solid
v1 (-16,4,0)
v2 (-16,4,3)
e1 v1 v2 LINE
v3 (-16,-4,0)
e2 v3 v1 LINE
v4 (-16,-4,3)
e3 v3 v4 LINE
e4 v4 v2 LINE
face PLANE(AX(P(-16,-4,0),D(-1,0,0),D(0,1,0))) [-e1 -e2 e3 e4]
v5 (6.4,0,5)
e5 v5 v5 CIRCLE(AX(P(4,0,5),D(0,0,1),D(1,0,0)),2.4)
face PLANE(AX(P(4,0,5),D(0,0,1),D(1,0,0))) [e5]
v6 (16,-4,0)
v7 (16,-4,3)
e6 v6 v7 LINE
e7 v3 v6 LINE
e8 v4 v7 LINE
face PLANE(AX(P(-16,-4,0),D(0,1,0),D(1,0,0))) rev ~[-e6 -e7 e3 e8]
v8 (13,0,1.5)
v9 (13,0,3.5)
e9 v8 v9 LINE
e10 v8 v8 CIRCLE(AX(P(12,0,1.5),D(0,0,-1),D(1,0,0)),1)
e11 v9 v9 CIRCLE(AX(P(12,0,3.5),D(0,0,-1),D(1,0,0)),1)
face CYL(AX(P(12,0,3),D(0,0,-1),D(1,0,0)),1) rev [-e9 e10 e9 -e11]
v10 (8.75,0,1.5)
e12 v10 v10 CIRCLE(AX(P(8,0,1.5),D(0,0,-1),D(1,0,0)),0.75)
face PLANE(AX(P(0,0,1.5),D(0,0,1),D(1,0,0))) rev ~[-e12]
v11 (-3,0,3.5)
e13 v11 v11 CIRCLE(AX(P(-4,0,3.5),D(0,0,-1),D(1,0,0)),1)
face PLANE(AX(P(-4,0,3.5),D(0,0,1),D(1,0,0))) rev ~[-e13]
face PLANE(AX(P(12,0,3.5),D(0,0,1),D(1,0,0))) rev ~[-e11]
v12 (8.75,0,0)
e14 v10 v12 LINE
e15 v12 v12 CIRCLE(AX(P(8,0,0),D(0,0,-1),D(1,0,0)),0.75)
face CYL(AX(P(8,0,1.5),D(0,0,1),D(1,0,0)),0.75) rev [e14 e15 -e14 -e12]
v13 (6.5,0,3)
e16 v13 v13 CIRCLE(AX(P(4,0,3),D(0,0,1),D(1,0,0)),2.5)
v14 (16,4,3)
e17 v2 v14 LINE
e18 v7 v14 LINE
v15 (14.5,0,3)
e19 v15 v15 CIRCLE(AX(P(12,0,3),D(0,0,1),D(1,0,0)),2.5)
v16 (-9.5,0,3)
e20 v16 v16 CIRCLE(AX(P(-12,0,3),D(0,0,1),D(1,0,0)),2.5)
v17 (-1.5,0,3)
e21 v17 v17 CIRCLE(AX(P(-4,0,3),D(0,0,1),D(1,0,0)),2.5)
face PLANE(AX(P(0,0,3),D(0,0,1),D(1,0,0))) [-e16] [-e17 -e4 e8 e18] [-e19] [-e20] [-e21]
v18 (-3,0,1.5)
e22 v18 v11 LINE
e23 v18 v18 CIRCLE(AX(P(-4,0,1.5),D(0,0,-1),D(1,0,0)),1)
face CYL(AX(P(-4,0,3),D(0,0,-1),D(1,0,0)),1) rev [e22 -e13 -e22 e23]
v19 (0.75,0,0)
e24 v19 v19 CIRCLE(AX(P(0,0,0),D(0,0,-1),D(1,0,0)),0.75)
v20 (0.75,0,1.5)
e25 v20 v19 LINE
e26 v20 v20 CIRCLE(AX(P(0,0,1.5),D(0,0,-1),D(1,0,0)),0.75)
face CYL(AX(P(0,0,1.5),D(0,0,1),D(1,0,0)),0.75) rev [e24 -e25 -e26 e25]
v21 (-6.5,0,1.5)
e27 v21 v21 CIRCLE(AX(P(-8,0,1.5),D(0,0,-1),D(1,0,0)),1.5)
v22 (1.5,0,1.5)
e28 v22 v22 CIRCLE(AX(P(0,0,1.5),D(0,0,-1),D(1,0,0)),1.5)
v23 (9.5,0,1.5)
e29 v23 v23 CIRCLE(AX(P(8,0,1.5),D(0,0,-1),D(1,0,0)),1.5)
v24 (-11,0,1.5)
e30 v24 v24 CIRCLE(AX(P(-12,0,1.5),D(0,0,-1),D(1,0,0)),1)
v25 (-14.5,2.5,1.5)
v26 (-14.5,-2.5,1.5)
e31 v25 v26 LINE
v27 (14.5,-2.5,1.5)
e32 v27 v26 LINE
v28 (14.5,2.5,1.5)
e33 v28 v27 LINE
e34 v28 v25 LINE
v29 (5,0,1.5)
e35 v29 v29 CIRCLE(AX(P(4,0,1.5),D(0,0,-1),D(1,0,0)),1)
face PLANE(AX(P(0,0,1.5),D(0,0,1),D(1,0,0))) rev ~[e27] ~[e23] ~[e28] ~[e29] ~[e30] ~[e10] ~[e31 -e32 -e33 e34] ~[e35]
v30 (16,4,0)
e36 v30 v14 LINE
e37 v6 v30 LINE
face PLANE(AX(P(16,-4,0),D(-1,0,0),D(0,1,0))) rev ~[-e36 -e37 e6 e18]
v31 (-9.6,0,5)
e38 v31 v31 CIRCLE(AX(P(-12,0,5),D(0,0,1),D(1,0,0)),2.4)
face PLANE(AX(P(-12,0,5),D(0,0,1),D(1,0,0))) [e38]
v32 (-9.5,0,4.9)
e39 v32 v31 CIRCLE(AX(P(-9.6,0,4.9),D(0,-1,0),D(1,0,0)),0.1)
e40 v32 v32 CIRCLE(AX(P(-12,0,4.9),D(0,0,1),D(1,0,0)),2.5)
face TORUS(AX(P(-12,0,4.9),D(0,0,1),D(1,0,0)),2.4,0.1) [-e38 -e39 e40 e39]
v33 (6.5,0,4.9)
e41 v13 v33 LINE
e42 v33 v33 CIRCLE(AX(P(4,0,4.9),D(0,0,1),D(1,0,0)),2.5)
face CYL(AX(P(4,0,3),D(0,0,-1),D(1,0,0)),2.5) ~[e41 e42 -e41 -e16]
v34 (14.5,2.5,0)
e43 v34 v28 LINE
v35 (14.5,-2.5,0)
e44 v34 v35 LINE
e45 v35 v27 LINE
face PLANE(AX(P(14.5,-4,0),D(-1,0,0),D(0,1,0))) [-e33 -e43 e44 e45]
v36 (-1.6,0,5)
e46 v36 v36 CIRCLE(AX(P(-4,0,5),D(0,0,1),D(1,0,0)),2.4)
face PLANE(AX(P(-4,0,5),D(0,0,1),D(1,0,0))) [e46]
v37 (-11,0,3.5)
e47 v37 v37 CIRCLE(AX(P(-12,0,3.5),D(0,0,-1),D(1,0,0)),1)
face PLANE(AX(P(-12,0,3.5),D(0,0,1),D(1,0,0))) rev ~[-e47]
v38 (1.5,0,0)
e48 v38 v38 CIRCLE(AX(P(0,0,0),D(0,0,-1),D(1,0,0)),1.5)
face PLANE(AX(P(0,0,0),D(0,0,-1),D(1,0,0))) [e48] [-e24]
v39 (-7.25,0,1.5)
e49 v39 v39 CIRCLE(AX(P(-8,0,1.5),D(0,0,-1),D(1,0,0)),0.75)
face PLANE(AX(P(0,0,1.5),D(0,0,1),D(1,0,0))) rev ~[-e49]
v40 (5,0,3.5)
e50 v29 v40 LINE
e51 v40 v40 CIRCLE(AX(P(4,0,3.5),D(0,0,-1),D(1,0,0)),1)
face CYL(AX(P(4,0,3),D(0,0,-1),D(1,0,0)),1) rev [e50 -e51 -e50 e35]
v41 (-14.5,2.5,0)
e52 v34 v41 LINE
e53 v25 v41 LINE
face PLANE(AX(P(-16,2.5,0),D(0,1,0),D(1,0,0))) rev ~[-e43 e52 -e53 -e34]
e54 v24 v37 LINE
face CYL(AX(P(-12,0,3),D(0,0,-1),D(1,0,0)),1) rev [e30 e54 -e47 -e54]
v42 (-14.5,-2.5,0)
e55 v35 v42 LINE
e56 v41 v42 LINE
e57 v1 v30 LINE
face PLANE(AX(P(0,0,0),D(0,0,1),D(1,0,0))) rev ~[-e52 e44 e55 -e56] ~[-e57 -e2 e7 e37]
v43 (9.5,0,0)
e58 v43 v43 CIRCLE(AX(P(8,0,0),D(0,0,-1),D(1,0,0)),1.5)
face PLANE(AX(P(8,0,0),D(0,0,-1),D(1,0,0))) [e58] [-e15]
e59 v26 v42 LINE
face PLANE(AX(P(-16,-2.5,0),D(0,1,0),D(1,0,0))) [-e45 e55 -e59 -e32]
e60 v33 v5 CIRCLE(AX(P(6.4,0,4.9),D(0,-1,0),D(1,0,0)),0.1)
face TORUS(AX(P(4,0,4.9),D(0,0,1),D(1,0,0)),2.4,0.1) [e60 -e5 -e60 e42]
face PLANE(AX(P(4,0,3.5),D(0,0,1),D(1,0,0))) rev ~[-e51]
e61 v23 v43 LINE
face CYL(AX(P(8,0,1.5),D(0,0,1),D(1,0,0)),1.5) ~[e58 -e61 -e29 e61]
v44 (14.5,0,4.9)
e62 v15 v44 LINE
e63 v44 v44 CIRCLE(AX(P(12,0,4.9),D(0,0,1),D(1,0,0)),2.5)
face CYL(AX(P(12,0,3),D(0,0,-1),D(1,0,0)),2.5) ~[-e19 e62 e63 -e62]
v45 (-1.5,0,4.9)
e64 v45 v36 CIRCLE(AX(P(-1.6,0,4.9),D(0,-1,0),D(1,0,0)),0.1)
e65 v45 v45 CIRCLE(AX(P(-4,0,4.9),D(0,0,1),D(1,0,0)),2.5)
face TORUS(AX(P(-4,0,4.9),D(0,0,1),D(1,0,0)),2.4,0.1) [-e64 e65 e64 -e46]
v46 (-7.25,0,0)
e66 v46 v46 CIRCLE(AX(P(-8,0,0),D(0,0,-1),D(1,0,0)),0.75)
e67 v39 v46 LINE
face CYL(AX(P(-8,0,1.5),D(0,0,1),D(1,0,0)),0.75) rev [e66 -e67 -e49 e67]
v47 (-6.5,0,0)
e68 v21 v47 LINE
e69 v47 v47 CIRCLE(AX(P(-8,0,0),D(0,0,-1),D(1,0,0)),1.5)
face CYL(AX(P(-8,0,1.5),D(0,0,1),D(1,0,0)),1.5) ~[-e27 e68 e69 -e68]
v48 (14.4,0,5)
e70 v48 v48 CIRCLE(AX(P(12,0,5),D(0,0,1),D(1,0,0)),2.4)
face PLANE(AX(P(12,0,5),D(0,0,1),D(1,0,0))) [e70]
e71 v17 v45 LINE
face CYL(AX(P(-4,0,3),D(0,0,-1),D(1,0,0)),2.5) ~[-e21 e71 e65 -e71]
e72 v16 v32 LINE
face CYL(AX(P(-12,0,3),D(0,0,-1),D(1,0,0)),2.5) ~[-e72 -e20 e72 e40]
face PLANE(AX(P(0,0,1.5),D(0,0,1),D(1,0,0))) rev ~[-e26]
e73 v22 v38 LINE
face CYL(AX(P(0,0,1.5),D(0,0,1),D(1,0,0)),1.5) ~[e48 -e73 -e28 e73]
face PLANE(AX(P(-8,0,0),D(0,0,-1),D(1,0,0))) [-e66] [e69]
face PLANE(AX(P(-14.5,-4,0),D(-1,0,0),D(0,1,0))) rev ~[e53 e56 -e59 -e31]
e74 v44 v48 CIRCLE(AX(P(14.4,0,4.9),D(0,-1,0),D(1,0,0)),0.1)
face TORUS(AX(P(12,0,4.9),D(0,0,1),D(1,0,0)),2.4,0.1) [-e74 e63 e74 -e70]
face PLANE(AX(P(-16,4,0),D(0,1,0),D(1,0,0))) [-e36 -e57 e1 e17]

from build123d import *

# Parameters (mm, degrees)
F0_W     = 32
F0_H     = 8
F1_DEPTH = 3
F2_R     = 2.5
F3_DEPTH = 2
F4_R     = 0.1
F5_T     = -1.5
F6_R     = 1.5
F6_R_2   = 0.75
F7_DEPTH = 1.5


# Not quite as in the source:
# - a feature names something its author has since deleted; it is built from what else it names


with BuildPart() as f1:
    # F0 (on Top) → F1 (new body)
    with BuildSketch(Plane.XY):
        Rectangle(F0_W, F0_H)
    extrude(amount=F1_DEPTH)

    # F2 (on face) → F3 (join)
    with BuildSketch(Plane.XY.offset(3)):
        with Locations((-12, 0)):
            Circle(F2_R)
        with Locations((-4, 0)):
            Circle(F2_R)
        with Locations((4, 0)):
            Circle(F2_R)
        with Locations((12, 0)):
            Circle(F2_R)
    extrude(amount=F3_DEPTH)

    # F4
    f4_edges = [f1.edges().sort_by_distance(p)[0] for p in [
        (-14.5, 0, 5),
        (-6.5, 0, 5),
        (1.5, 0, 5),
        (9.5, 0, 5),
    ]]
    fillet(f4_edges, radius=F4_R)

    # F5
    f5_openings = [f1.faces().sort_by_distance(p)[0] for p in [
        (0, 0, 0),
    ]]
    offset(amount=F5_T, openings=f5_openings, kind=Kind.INTERSECTION)

    # F6 (on face) → F7 (join, through all)
    with BuildSketch(Plane(origin=(0, 0, 1.5), x_dir=(1, 0, 0), z_dir=(0, 0, -1))):
        with Locations((-8, 0)):
            Circle(F6_R)
        with Locations((-8, 0)):
            Circle(F6_R_2, mode=Mode.SUBTRACT)
        Circle(F6_R)
        Circle(F6_R_2, mode=Mode.SUBTRACT)
        with Locations((8, 0)):
            Circle(F6_R)
        with Locations((8, 0)):
            Circle(F6_R_2, mode=Mode.SUBTRACT)
    extrude(amount=F7_DEPTH)


solid = f1.part
